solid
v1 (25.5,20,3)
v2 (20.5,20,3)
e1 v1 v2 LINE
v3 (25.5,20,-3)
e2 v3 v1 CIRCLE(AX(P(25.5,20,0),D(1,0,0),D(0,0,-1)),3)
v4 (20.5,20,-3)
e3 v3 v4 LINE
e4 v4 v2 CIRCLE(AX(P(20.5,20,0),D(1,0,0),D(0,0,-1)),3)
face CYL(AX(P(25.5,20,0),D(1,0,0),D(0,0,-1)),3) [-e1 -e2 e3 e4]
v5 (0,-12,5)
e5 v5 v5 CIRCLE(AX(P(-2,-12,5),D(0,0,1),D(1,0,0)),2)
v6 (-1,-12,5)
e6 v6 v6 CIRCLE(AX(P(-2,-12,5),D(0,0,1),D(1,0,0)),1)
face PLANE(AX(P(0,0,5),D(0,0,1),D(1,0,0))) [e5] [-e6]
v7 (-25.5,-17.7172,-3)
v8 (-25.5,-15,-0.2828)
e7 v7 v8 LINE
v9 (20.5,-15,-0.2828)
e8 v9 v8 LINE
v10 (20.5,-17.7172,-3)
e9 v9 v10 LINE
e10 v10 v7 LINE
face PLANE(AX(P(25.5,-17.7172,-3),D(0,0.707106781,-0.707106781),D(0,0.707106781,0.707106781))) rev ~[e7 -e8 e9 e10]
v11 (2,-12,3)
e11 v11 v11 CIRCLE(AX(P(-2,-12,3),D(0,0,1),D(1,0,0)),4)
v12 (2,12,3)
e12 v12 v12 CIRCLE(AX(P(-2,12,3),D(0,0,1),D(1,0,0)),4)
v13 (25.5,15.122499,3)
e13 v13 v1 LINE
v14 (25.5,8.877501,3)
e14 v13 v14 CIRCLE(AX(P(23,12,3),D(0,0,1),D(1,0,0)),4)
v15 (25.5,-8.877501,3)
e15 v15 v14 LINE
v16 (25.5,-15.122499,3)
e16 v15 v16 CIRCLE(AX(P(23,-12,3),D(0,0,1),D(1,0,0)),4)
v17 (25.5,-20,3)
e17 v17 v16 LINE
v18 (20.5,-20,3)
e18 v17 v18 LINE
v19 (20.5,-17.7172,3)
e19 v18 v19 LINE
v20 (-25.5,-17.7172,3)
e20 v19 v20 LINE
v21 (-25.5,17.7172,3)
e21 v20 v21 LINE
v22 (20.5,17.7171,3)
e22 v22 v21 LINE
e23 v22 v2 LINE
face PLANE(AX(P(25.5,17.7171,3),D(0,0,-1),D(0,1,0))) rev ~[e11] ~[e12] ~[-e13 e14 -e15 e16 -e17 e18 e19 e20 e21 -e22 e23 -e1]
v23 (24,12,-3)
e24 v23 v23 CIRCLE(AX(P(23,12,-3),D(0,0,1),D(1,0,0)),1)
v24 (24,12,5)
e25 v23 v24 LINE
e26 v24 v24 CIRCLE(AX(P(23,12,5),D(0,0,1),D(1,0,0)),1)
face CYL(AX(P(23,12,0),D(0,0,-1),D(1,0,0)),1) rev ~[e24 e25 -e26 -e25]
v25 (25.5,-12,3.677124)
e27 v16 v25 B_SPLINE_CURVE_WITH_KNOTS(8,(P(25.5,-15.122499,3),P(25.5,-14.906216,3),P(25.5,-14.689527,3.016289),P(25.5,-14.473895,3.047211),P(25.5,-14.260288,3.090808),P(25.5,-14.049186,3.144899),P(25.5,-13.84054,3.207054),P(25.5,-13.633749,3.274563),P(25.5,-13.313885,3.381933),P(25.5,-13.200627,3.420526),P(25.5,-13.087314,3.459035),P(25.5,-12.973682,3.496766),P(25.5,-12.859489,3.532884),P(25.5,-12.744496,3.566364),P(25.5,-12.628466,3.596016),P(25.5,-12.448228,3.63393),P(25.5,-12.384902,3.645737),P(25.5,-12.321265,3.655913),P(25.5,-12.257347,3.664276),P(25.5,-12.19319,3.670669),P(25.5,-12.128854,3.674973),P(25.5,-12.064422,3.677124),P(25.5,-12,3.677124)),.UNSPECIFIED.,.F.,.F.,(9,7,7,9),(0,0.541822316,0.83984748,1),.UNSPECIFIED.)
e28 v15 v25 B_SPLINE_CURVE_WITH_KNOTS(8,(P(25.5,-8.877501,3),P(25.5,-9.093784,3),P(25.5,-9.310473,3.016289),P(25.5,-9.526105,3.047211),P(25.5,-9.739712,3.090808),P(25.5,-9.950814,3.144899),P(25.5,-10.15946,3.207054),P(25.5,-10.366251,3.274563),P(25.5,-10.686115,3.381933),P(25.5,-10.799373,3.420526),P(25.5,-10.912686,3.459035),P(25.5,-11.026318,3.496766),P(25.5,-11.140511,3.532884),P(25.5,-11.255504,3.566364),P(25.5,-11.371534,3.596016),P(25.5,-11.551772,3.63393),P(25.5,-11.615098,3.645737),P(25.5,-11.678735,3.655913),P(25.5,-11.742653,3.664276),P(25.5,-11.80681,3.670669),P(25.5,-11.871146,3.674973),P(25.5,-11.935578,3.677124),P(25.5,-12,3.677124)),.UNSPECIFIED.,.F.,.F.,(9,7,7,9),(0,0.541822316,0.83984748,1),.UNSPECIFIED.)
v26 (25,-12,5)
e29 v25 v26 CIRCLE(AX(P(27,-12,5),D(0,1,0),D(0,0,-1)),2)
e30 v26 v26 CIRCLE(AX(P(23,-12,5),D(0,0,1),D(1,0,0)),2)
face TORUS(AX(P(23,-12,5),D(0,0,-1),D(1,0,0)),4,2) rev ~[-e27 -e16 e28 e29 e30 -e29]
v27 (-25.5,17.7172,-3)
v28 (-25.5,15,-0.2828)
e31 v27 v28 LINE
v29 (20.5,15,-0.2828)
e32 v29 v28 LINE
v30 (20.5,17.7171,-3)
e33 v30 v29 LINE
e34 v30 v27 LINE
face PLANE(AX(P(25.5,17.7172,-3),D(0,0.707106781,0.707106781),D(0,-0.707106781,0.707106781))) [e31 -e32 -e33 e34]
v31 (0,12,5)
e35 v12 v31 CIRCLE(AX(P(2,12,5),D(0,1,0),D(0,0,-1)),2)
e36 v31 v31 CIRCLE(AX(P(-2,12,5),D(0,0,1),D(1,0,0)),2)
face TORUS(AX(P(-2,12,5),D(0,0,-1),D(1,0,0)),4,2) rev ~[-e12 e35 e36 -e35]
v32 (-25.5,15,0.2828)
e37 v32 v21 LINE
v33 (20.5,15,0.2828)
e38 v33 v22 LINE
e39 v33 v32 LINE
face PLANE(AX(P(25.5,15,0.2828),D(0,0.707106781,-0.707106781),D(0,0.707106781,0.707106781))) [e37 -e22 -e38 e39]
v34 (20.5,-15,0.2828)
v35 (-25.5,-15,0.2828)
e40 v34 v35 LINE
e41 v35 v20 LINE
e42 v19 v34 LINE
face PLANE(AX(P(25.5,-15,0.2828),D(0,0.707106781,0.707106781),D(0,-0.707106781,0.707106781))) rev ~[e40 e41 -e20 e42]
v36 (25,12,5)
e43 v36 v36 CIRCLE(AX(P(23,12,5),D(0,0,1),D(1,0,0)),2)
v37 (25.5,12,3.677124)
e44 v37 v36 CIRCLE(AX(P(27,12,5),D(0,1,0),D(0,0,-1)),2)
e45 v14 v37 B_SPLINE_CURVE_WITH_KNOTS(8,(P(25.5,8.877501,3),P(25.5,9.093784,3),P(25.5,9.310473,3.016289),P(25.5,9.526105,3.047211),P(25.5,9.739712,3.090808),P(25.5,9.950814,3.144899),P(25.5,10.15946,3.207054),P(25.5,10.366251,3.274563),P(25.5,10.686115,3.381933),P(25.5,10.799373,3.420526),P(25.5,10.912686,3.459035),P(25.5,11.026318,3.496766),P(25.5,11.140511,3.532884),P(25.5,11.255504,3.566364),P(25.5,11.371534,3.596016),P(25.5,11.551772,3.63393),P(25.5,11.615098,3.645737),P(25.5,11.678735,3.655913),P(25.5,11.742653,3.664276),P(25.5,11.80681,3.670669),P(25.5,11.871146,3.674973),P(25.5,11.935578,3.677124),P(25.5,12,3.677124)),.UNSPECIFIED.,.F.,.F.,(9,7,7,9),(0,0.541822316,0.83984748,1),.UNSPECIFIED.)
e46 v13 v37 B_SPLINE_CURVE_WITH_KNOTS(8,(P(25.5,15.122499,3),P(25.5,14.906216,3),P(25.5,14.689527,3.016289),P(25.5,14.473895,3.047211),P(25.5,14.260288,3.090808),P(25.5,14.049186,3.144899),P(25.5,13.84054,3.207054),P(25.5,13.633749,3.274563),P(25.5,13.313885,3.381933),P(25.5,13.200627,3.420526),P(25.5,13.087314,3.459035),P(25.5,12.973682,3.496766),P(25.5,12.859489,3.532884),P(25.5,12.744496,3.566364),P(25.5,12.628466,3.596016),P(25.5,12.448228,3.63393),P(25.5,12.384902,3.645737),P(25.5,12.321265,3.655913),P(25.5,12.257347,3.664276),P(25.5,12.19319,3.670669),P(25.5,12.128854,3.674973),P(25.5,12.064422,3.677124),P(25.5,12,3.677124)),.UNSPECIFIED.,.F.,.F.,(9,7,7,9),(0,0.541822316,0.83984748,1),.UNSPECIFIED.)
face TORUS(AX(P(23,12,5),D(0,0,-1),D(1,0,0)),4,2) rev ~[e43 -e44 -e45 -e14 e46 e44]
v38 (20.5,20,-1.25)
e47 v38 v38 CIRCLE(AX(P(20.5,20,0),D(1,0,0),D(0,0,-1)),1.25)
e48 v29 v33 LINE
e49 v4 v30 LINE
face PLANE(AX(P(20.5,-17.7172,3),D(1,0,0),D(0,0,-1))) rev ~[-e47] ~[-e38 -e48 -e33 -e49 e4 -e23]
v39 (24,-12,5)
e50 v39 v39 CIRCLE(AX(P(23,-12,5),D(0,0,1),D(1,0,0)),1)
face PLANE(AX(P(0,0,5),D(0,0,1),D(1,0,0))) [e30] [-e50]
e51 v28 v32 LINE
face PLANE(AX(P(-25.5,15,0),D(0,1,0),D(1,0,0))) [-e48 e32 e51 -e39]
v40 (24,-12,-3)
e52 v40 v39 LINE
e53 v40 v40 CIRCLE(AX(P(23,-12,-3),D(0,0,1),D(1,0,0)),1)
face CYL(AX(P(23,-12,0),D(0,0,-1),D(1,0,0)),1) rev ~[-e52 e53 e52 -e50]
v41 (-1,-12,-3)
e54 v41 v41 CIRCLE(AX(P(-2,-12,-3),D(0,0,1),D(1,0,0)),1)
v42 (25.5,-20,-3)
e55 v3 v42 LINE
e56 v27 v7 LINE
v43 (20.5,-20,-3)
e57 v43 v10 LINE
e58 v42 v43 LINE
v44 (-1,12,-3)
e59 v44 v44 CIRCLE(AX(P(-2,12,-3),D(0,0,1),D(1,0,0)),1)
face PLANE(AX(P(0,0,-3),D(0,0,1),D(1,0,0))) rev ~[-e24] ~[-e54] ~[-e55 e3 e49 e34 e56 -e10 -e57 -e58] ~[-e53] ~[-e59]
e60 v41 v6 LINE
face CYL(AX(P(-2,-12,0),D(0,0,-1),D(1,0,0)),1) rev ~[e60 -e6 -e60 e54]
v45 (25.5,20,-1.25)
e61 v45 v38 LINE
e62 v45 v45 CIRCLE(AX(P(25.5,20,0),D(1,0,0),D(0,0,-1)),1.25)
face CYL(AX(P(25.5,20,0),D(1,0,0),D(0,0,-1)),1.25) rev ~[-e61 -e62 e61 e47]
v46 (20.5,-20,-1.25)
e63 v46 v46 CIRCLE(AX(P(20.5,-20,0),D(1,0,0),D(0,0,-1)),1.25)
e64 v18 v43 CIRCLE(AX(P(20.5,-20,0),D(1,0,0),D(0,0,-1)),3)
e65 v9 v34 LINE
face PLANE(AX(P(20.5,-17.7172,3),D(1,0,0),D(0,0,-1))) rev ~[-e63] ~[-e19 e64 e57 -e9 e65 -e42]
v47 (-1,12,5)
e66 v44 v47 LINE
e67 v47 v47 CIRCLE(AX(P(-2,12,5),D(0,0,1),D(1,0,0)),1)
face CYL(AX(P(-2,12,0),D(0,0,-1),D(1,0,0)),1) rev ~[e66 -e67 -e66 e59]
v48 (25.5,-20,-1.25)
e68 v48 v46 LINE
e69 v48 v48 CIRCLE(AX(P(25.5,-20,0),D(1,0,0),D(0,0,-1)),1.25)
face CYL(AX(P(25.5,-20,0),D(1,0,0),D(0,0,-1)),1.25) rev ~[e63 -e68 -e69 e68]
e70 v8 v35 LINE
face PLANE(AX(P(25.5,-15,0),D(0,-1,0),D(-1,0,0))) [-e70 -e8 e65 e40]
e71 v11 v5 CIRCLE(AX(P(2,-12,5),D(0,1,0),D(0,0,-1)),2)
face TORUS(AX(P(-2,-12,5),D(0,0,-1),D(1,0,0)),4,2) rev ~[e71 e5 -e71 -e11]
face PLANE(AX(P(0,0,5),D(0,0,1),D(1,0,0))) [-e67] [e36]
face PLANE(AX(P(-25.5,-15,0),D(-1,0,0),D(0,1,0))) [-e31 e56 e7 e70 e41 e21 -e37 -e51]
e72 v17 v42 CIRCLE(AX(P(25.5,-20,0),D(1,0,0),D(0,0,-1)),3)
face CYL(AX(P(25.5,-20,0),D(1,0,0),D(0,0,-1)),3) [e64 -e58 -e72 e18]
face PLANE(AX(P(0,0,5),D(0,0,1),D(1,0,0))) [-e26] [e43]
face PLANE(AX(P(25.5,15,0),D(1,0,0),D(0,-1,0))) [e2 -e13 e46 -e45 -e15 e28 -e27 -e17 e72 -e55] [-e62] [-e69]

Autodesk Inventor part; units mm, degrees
ref_plane "YZ Plane" through (0, 0, 0) normal (1, 0, 0) x (0, 1, 0)
ref_plane "XZ Plane" through (0, 0, 0) normal (0, 1, 0) x (-1, 0, 0)
ref_plane "XY Plane" through (0, 0, 0) normal (0, 0, 1) x (1, 0, 0)
sketch "스케치1" plane through (0, 0, 0) normal (0, 0, 1) x (1, 0, 0)
  line L0 (-25.5, 15) -> (25.5, 15)
  line L1 (25.5, 15) -> (25.5, -15)
  line L2 (25.5, -15) -> (-25.5, -15)
  line L3 (-25.5, -15) -> (-25.5, 15)
  line L4 (-25.5, 15) -> (25.5, -15) construction
  line L5 (25.5, 15) -> (-25.5, -15) construction
  line L6 (-2, -12) -> (23, -12) construction
  line L7 (23, -12) -> (23, 12) construction
  line L8 (23, 12) -> (-2, 12) construction
  line L9 (-2, 12) -> (-2, -12) construction
  line L10 (-2, -12) -> (23, 12) construction
  line L11 (23, -12) -> (-2, 12) construction
  circle A0 centre (-2, 12) radius 1
  line L12 (10.5, 0) -> (13.8415, 0)
  line L13 (10.5, 0) -> (10.5, -2.9401)
  circle A1 centre (23, 12) radius 1
  circle A2 centre (-2, -12) radius 1
  circle A3 centre (23, -12) radius 1
  point P0 (0, 0)
  dimension "d0" = 51
  dimension "d1" = 30
  dimension "d2" = 2
  dimension "d3" = 15
  dimension "d4" = 24
  dimension "d5" = 25
extrude "돌출1" add sketch "스케치1" along normal mid plane 6
sketch "스케치4" plane through (25.5, -15, -3) normal (1, 0, 0) x (0, 0, -1)
  line L0 (-6, -3) -> (0, -3)
  line L1 (0, -3) -> (0, 33)
  line L2 (0, 33) -> (-6, 33)
  line L3 (-6, 33) -> (-6, -3)
  line L4 (-6, -3) -> (0, 33) construction
  line L5 (0, -3) -> (-6, 33) construction
  line L6 (-6, 33) -> (-3, 30)
  line L7 (-3, 30) -> (0, 33)
  line L8 (0.1414, 32.8586) -> (-3, 29.7172)
  line L9 (-3, 29.7172) -> (-6, 32.7172)
  line L10 (-3, 15) -> (-1.4715, 15)
  line L11 (0.1414, -2.8586) -> (-3, 0.2828)
  line L12 (-3, 0.2828) -> (-6, -2.7172)
  line L13 (0, 30) -> (-6, 30) projected
  line L14 (-6, 0) -> (-6, 30) projected
  line L15 (0, 0) -> (-6, 0) projected
  line L16 (0, 30) -> (0, 0) projected
  point P0 (-6, 0)
  point P1 (0, -2.7172)
  point P2 (-6, 30)
  point P3 (0, 32.7172)
  point P4 (-5, 32.7172)
  point P5 (-2.7172, 0)
  point P6 (-3.2828, 0)
  point P7 (-3.2828, 30)
  point P8 (-2.7172, 30)
  dimension "d25" = 36
  dimension "d27" = 90
  dimension "d28" = 0.2
extrude "돌출3" add sketch "스케치4" against normal up to surface (51 mm away) contours L3 L15 L12 | L11 L15 L1 | L3 L9 L13 | L13 L8 L1
sketch "스케치6" plane through (25.5, -17.7172, 3) normal (1, 0, 0) x (0, 0, -1)
  circle A0 centre (3, 37.7172) radius 3
  circle A1 centre (3, 37.7172) radius 1.25
  line L0 (3, 17.7172) -> (21.0559, 17.7172)
  circle A2 centre (3, -2.2828) radius 3
  circle A3 centre (3, -2.2828) radius 1.25
  line L1 (0, 35.4343) -> (0, 0) projected
  line L2 (0, 35.4343) -> (0, 37.7172)
  line L3 (6, 0) -> (6, 35.4343) projected
  line L4 (6, 37.7172) -> (6, 35.4343)
  line L5 (0, -2.2828) -> (0, 0)
  line L6 (6, -2.2828) -> (6, 0)
  line L7 (3.2828, 32.7172) -> (2.7172, 32.7172) projected
  line L8 (2.7172, 32.7172) -> (0, 35.4343) projected
  line L9 (0, 35.4343) -> (0, 0) projected
  line L10 (0, 0) -> (2.7172, 2.7172) projected
  line L11 (3.2828, 2.7172) -> (2.7172, 2.7172) projected
  line L12 (3.2828, 2.7172) -> (6, 0) projected
  line L13 (6, 0) -> (6, 35.4343) projected
  line L14 (6, 35.4343) -> (3.2828, 32.7172) projected
  dimension "d36" = 6
  dimension "d37" = 2.5
  dimension "d38" = 40
extrude "돌출5" add sketch "스케치6" against normal blind 5 contours A0 | L4 L14 L7 L8 L2 A0 | L10 L11 L12 L6 A2 L5 | A2
sketch "스케치7" plane through (0, 0, 3) normal (0, 0, 1) x (1, 0, 0)
  circle A0 centre (-2, 12) radius 1 projected
  circle A1 centre (-2, 12) radius 2
  circle A2 centre (23, 12) radius 1 projected
  circle A3 centre (23, 12) radius 2
  circle A4 centre (-2, -12) radius 1 projected
  circle A5 centre (-2, -12) radius 2
  circle A6 centre (23, -12) radius 1 projected
  circle A7 centre (23, -12) radius 2
  point P0 (0, 0)
  dimension "d41" = 4
  dimension "d42" = 4
  dimension "d43" = 4
  dimension "d44" = 4
extrude "돌출6" add sketch "스케치7" along normal blind 2
fillet "모깎기1" radius 2 4 edges at (-4, 12, 3) (21, 12, 3) (-4, -12, 3) (21, -12, 3)
properties part number "카메라 홀더"
